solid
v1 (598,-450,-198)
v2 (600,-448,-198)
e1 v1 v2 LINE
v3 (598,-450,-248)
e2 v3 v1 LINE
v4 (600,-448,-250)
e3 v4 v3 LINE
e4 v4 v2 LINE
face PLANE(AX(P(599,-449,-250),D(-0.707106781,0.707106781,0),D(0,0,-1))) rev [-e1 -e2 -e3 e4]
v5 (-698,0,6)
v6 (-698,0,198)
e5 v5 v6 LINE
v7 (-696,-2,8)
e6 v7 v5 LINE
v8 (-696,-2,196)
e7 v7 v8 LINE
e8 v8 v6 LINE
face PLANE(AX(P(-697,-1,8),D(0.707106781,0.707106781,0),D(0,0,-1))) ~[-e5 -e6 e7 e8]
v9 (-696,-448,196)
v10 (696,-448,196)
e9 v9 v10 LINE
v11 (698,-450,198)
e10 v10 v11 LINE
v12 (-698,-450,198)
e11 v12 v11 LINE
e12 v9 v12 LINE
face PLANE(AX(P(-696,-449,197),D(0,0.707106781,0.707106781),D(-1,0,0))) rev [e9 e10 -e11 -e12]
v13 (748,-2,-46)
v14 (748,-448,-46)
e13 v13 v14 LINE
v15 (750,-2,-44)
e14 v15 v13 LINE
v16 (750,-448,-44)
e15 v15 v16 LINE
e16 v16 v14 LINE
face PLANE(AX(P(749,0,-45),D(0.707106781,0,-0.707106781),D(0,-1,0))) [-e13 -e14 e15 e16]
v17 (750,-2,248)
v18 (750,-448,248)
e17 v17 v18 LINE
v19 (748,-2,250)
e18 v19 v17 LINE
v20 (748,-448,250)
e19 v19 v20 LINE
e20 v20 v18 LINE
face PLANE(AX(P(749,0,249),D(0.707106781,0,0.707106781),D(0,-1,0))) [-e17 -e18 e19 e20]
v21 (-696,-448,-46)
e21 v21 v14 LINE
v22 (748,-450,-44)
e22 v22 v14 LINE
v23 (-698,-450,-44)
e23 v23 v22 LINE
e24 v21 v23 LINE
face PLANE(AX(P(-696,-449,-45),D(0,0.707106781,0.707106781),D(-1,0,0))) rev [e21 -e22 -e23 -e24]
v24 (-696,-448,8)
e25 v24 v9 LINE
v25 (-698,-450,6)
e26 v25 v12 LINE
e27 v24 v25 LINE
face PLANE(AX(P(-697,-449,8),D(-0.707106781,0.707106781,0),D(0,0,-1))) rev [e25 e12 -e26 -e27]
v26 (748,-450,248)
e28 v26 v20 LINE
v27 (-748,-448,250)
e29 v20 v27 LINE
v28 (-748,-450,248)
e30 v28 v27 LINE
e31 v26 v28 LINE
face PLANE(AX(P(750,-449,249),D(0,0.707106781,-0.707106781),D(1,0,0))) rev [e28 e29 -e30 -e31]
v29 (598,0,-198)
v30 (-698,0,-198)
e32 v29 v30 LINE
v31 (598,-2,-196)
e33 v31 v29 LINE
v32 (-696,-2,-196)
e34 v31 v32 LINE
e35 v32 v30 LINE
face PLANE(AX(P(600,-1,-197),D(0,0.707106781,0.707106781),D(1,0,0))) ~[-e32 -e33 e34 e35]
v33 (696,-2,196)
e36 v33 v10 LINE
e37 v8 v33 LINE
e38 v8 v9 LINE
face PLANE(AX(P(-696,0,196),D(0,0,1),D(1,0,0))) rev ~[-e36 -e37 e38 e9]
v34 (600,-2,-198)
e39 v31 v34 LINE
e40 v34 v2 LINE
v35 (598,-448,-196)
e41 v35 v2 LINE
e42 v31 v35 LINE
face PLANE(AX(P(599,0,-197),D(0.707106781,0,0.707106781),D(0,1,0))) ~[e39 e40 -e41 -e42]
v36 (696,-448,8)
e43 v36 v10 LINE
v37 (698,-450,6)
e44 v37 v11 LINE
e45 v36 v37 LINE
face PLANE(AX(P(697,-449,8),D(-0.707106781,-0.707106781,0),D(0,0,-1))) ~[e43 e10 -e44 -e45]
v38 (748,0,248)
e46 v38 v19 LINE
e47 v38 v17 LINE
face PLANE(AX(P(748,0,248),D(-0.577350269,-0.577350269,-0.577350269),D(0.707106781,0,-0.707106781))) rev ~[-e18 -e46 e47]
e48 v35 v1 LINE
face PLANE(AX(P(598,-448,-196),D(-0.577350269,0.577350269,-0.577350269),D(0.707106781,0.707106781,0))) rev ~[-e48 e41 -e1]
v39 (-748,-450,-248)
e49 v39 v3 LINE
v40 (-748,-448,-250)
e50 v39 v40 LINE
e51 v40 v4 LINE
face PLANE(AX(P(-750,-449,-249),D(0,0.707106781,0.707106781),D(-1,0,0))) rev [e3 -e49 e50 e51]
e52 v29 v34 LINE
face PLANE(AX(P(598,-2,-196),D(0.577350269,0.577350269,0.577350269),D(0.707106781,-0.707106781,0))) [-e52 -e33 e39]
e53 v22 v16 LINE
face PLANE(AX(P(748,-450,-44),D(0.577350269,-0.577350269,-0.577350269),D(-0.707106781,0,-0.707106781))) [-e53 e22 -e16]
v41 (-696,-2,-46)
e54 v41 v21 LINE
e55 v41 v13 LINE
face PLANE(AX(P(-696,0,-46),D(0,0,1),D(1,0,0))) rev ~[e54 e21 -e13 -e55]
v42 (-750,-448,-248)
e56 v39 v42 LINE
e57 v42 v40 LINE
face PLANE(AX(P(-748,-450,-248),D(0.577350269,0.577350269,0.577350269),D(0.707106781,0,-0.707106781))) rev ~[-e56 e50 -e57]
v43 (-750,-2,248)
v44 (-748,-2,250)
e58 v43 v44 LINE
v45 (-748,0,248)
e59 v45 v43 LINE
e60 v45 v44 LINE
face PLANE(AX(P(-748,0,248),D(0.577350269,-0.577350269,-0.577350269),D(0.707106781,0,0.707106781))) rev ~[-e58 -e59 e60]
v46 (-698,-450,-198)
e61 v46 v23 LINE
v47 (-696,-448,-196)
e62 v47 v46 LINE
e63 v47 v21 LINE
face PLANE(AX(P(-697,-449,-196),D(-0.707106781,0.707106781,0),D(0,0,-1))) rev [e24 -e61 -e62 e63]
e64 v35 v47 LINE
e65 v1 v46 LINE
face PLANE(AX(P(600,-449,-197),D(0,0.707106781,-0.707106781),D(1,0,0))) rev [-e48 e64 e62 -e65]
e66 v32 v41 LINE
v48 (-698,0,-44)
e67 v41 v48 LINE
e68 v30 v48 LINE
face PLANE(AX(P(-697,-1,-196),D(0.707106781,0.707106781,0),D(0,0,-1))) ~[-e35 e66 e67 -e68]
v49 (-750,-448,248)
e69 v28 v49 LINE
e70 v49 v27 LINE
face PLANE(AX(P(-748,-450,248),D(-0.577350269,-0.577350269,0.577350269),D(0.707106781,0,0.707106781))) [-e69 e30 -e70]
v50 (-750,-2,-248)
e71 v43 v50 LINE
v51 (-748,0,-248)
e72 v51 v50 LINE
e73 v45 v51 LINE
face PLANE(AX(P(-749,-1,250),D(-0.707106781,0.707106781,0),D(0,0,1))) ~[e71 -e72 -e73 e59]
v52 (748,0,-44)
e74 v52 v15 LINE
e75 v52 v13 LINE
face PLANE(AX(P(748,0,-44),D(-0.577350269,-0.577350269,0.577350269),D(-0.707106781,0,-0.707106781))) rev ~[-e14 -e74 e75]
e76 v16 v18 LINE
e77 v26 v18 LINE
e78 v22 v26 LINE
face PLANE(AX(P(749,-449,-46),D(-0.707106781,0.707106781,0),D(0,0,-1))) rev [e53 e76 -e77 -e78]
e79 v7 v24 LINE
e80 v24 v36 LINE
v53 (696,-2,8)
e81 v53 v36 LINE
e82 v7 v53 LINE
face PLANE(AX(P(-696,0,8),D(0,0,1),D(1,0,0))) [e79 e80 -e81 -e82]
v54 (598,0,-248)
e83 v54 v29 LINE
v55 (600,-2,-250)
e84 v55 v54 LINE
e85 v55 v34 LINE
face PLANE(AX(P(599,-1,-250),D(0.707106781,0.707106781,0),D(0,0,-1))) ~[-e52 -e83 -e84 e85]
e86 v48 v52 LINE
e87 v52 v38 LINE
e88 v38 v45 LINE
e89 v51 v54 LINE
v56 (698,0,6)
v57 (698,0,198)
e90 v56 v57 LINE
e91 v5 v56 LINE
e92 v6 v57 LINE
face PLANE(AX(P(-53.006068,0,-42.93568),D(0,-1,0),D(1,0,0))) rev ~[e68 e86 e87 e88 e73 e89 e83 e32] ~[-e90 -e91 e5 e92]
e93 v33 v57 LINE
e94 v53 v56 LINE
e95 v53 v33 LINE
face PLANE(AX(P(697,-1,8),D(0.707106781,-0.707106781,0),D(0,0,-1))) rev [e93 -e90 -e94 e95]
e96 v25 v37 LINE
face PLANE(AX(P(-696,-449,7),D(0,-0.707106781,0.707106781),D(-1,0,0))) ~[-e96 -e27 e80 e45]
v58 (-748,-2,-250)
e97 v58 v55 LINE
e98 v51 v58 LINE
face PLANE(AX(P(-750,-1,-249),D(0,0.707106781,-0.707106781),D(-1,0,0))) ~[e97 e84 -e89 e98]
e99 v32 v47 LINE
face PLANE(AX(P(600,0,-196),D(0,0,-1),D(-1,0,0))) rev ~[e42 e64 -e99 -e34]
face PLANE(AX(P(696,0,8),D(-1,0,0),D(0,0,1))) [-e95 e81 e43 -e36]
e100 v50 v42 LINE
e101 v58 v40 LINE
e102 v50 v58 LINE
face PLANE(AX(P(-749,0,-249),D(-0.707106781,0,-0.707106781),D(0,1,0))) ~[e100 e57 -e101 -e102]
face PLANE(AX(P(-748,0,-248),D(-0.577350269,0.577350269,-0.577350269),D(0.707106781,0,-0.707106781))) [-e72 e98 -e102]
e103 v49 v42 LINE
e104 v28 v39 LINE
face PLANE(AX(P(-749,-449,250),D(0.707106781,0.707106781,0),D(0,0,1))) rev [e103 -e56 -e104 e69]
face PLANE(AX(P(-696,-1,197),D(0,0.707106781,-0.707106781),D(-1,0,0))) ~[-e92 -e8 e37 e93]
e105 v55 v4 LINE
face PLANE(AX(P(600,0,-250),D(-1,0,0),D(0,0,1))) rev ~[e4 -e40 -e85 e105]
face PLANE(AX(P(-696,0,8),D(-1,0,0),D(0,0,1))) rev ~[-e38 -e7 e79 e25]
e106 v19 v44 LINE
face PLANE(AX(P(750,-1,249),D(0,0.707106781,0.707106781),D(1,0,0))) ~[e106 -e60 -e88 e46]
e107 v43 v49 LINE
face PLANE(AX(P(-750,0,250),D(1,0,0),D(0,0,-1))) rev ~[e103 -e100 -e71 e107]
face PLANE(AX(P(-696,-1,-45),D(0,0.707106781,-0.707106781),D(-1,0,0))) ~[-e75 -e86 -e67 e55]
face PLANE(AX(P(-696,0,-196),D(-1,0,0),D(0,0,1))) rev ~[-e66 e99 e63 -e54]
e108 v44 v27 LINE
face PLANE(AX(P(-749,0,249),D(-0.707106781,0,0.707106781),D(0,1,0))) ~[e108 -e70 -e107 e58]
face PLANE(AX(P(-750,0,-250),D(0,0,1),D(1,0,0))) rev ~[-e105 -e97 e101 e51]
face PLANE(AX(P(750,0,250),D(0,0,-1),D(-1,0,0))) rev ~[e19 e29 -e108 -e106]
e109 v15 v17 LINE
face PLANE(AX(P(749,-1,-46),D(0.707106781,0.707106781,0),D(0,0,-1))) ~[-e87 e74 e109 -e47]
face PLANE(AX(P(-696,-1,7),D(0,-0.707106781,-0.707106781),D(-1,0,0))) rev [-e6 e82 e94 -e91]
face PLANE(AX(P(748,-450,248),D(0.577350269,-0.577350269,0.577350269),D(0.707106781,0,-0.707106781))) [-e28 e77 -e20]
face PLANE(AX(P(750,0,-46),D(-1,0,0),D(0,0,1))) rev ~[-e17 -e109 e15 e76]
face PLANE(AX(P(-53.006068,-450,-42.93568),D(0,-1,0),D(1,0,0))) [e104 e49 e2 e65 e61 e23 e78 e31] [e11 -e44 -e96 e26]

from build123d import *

# Parameters (mm, degrees)
F0_W     = 1392
F0_H     = 188
F1_DEPTH = 450
F2_SIZE  = 2


# Not quite as in the source:
# - a feature names something its author has since deleted; it is built from what else it names


with BuildPart() as f1:
    # F0 (on Front) → F1 (new body)
    with BuildSketch(Plane.XZ):
        Polygon((750, 250), (-750, 250), (-750, -250), (600, -250), (600, -196), (-696, -196), (-696, -46), (750, -46), align=None)
        with Locations((0, 102)):
            Rectangle(F0_W, F0_H, mode=Mode.SUBTRACT)
    extrude(amount=F1_DEPTH)

    # F2
    f2_edges = [f1.edges().sort_by_distance(p)[0] for p in [
        (-750, -225, 250),
        (-750, -225, -250),
        (-750, 0, 0),
        (-750, -450, 0),
        (750, -225, 250),
        (0, 0, 250),
        (0, -450, 250),
        (750, -225, -46),
        (750, 0, 102),
        (750, -450, 102),
        (-75, -450, -250),
        (600, -450, -223),
        (-48, -450, -196),
        (-696, -450, -121),
        (27, -450, -46),
        (-696, -450, 102),
        (0, -450, 196),
        (696, -450, 102),
        (0, -450, 8),
        (-75, 0, -250),
        (600, 0, -223),
        (-48, 0, -196),
        (-696, 0, -121),
        (27, 0, -46),
        (-696, 0, 102),
        (0, 0, 196),
        (696, 0, 102),
        (0, 0, 8),
        (600, -225, -196),
    ]]
    chamfer(f2_edges, length=F2_SIZE)


solid = f1.part
